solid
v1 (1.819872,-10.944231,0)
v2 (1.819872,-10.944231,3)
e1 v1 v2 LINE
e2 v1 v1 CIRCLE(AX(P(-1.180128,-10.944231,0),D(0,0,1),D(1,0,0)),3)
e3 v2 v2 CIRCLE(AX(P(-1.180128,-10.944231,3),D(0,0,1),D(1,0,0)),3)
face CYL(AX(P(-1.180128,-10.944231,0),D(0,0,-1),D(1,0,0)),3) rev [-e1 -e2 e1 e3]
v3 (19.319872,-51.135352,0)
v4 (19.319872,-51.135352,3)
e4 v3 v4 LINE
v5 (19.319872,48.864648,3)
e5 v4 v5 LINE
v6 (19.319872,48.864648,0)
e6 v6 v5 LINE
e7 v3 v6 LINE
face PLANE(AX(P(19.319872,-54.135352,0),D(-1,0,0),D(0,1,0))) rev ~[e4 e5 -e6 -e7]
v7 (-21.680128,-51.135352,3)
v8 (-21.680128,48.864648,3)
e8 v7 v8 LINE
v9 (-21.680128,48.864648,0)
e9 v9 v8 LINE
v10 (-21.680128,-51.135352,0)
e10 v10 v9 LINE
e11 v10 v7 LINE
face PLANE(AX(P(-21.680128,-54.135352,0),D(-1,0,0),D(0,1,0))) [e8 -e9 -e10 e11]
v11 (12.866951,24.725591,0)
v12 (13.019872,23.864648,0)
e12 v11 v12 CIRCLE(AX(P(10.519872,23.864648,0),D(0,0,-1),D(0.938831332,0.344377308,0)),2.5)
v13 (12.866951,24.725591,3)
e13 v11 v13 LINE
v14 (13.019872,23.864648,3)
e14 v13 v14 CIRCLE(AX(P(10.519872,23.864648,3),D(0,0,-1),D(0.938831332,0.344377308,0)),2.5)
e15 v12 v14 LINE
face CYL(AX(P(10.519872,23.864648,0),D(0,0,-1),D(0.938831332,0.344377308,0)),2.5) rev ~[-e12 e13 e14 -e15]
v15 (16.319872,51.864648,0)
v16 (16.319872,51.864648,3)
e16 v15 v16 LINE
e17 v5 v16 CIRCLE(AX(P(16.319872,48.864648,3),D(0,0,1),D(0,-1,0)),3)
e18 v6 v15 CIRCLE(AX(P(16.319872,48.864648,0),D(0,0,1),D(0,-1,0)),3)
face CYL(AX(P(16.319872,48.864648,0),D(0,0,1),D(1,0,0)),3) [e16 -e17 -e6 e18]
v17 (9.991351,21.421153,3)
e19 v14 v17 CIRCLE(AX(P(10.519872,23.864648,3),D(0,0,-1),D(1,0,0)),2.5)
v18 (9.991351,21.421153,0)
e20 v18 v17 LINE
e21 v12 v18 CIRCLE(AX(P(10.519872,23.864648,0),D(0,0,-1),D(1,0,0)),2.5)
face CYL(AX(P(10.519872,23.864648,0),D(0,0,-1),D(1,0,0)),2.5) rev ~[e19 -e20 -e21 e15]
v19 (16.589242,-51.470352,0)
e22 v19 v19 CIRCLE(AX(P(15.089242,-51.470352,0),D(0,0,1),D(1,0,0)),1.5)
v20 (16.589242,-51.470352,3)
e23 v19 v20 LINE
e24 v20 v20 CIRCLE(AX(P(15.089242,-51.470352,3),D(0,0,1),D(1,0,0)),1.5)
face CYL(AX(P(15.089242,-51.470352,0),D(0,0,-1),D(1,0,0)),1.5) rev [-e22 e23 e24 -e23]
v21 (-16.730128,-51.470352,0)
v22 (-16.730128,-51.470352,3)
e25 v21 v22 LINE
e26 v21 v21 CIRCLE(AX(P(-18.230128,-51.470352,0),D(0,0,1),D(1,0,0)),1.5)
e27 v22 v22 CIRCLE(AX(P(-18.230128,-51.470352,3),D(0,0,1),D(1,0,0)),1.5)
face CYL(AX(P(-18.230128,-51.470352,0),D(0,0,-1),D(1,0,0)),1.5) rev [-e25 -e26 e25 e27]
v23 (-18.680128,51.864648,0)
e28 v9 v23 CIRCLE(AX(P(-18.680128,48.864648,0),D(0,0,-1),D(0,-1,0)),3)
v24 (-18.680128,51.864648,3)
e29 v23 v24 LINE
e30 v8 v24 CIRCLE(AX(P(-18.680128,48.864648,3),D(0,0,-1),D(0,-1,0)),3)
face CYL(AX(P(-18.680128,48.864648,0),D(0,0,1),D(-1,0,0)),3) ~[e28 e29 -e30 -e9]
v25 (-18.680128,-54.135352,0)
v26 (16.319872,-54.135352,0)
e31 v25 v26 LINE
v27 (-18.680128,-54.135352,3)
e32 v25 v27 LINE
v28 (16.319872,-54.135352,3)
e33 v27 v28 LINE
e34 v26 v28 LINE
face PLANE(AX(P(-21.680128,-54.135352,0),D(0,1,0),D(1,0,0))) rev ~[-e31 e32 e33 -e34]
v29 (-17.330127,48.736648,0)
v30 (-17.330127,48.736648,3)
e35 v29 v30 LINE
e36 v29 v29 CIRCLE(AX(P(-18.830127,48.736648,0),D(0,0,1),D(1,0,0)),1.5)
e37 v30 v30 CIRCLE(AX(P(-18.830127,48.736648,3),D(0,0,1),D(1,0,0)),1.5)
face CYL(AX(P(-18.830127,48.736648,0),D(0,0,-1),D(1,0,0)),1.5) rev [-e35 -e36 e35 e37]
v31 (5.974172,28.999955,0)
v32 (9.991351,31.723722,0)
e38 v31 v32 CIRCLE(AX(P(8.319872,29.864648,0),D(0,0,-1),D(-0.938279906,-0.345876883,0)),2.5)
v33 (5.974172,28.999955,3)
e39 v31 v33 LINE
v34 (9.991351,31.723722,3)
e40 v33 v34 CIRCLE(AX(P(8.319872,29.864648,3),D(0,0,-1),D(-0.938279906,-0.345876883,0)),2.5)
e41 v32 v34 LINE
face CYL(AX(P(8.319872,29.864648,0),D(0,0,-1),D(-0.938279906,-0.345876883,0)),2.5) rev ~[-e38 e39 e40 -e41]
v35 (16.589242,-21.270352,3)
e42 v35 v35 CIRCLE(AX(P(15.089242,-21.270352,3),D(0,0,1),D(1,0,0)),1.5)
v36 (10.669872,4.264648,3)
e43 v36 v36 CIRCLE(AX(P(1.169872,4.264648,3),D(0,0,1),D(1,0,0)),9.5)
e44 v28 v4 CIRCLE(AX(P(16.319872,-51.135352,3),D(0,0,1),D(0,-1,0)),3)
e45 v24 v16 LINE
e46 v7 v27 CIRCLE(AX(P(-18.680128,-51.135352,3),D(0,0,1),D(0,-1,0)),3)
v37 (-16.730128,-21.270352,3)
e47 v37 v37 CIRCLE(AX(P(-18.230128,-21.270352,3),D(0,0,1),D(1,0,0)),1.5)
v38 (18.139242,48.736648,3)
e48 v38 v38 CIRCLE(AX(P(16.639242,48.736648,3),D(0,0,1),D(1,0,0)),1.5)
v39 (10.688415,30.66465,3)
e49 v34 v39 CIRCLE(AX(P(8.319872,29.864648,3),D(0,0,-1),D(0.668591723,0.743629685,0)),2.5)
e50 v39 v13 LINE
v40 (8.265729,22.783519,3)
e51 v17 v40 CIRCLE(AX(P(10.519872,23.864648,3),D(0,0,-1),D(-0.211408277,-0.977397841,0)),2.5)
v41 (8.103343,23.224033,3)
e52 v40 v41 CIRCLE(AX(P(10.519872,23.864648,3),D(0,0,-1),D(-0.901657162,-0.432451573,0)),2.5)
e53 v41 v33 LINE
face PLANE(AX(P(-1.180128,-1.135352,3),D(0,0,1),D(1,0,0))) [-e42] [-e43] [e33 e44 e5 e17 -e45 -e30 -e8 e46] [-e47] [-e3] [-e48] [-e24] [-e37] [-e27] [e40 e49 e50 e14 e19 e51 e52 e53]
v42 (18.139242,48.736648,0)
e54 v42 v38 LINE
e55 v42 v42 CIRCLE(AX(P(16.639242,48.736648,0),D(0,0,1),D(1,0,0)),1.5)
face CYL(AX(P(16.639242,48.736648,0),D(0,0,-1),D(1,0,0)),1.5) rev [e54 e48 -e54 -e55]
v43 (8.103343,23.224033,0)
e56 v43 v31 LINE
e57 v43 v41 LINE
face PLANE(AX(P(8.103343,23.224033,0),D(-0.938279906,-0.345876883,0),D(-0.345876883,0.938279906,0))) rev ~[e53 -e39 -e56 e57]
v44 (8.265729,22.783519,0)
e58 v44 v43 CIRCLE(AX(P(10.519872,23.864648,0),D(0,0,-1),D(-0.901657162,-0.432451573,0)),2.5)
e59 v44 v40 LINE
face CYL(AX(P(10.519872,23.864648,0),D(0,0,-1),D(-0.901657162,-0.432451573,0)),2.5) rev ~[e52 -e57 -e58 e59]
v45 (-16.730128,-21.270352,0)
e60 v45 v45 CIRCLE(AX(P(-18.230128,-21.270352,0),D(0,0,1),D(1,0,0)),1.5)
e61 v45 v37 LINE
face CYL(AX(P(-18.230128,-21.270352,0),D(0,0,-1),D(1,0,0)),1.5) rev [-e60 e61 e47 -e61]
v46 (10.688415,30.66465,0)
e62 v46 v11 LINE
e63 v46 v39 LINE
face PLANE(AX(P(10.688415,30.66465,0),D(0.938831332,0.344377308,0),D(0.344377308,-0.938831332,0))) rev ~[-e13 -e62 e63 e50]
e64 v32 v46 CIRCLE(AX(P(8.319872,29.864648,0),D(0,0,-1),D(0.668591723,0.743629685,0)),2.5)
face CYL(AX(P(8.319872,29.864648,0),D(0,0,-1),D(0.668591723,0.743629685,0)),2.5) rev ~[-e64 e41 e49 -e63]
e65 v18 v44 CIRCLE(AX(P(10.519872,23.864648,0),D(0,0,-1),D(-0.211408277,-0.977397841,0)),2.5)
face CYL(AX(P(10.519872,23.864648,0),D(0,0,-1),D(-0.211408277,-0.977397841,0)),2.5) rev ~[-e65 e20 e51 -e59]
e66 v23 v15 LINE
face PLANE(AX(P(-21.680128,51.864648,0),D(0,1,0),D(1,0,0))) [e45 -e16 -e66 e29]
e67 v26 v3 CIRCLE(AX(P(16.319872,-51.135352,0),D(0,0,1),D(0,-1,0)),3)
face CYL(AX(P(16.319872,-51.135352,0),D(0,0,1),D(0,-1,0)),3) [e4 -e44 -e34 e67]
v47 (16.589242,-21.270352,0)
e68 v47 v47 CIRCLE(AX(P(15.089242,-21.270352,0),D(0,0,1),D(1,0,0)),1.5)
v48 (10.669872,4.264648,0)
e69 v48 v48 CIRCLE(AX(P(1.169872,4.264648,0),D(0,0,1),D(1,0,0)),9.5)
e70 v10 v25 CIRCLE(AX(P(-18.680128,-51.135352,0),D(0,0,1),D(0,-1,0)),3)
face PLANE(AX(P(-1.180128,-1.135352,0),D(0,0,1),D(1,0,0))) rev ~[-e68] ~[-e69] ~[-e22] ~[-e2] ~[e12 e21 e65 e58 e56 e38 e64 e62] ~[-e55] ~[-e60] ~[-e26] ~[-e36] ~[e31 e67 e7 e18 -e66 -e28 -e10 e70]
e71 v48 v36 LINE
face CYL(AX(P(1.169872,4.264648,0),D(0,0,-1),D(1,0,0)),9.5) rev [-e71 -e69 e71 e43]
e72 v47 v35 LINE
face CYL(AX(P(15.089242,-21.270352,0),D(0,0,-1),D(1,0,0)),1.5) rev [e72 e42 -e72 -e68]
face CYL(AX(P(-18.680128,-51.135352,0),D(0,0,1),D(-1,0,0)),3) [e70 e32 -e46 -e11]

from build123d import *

# Parameters (mm, degrees)
F0_W     = 41
F0_H     = 106
F0_R     = 1.5
F0_R_2   = 5.05
F0_R_3   = 2
F0_R_4   = 3
F0_R_5   = 9.5
F1_DEPTH = 3
F2_R     = 3


# Not quite as in the source:
# - a feature names something its author has since deleted; it is built from what else it names


with BuildPart() as f1:
    # F0 (on Top) → F1 (new body)
    with BuildSketch(Plane.XY):
        with Locations((-1.1801278293, -1.1353523731)):
            Rectangle(F0_W, F0_H)
        with Locations((-18.2301278293, -51.4703523731)):
            Circle(F0_R, mode=Mode.SUBTRACT)
        with Locations((-6.776117335, -33.481924504)):
            Circle(F0_R_2, mode=Mode.SUBTRACT)
        with Locations((-18.2301278293, -21.2703523731)):
            Circle(F0_R, mode=Mode.SUBTRACT)
        with Locations((-11.8353097141, -18.4490393624)):
            Circle(F0_R_3, mode=Mode.SUBTRACT)
        with BuildLine():
            ThreePointArc((0.9913514778, -28.481924504), (-4.9415118708, -25.855220261), (-8.0481067447, -20.1589485871))
            Line((-8.0481067447, -20.1589485871), (9.9913514778, -20.516399593))
            Line((9.9913514778, -20.516399593), (9.9913514778, -46.516399593))
            Line((9.9913514778, -46.516399593), (-8.0481067447, -46.804900421))
            ThreePointArc((-8.0481067447, -46.804900421), (-4.9415118708, -41.1086287471), (0.9913514778, -38.481924504))
            Line((0.9913514778, -38.481924504), (0.9913514778, -28.481924504))
        make_face(mode=Mode.SUBTRACT)
        with Locations((15.0892422113, -51.4703523731)):
            Circle(F0_R, mode=Mode.SUBTRACT)
        with Locations((-1.1801278293, -10.9442314133)):
            Circle(F0_R_4, mode=Mode.SUBTRACT)
        with Locations((15.0892422113, -21.2703523731)):
            Circle(F0_R, mode=Mode.SUBTRACT)
        with Locations((-11.8353097141, -0.1353523731)):
            Circle(F0_R_3, mode=Mode.SUBTRACT)
        with Locations((-11.8353097141, 18.1783346161)):
            Circle(F0_R_3, mode=Mode.SUBTRACT)
        with Locations((-18.8301271707, 48.7366476269)):
            Circle(F0_R, mode=Mode.SUBTRACT)
        with Locations((-6.776117335, 33.2112197578)):
            Circle(F0_R_2, mode=Mode.SUBTRACT)
        with Locations((1.1698721707, 4.2646476269)):
            Circle(F0_R_5, mode=Mode.SUBTRACT)
        with BuildLine():
            ThreePointArc((0.9913514778, 38.2112197578), (-4.9415118708, 40.8379240009), (-8.0481067447, 46.5341956747))
            Line((-8.0481067447, 46.5341956747), (9.9913514778, 46.2456948468))
            Line((9.9913514778, 46.2456948468), (9.9913514778, 31.7237218389))
            ThreePointArc((9.9913514778, 31.7237218389), (10.4081379557, 31.2391097076), (10.6884153726, 30.6646495649))
            Line((10.6884153726, 30.6646495649), (12.8669505005, 24.7255908967))
            ThreePointArc((12.8669505005, 24.7255908967), (12.9813448828, 24.3018570593), (13.0198721707, 23.8646476269))
            ThreePointArc((13.0198721707, 23.8646476269), (12.0896967258, 21.9189727141), (9.9913514778, 21.4211530234))
            Line((9.9913514778, 21.4211530234), (9.9913514778, 20.2456948468))
            Line((9.9913514778, 20.2456948468), (-8.0481067447, 19.8882438409))
            ThreePointArc((-8.0481067447, 19.8882438409), (-4.9415118708, 25.5845155147), (0.9913514778, 28.2112197578))
            Line((0.9913514778, 28.2112197578), (0.9913514778, 38.2112197578))
        make_face(mode=Mode.SUBTRACT)
        with Locations((16.6392421771, 48.7366476269)):
            Circle(F0_R, mode=Mode.SUBTRACT)
        with BuildLine():
            Line((9.9913514778, -20.516399593), (-8.0481067447, -20.1589485871))
            ThreePointArc((-8.0481067447, -20.1589485871), (-4.9415118708, -25.855220261), (0.9913514778, -28.481924504))
            Line((0.9913514778, -28.481924504), (0.9913514778, -38.481924504))
            ThreePointArc((0.9913514778, -38.481924504), (-4.9415118708, -41.1086287471), (-8.0481067447, -46.804900421))
            Line((-8.0481067447, -46.804900421), (9.9913514778, -46.516399593))
            Line((9.9913514778, -46.516399593), (9.9913514778, -20.516399593))
        make_face()
        with Locations((-2.2937730764, -41.981924504)):
            Circle(F0_R, mode=Mode.SUBTRACT)
        with Locations((-2.2937730764, -24.981924504)):
            Circle(F0_R, mode=Mode.SUBTRACT)
        with BuildLine():
            Line((9.9913514778, 46.2456948468), (-8.0481067447, 46.5341956747))
            ThreePointArc((-8.0481067447, 46.5341956747), (-4.9415118708, 40.8379240009), (0.9913514778, 38.2112197578))
            Line((0.9913514778, 38.2112197578), (0.9913514778, 28.2112197578))
            ThreePointArc((0.9913514778, 28.2112197578), (-4.9415118708, 25.5845155147), (-8.0481067447, 19.8882438409))
            Line((-8.0481067447, 19.8882438409), (9.9913514778, 20.2456948468))
            Line((9.9913514778, 20.2456948468), (9.9913514778, 21.4211530234))
            ThreePointArc((9.9913514778, 21.4211530234), (8.9707387909, 21.9024586015), (8.2657292668, 22.7835186943))
            ThreePointArc((8.2657292668, 22.7835186943), (8.1741724057, 22.9999554201), (8.1033430916, 23.2240329142))
            Line((8.1033430916, 23.2240329142), (5.9741724057, 28.9999554201))
            ThreePointArc((5.9741724057, 28.9999554201), (6.9168863609, 31.9338578186), (9.9913514778, 31.7237218389))
            Line((9.9913514778, 31.7237218389), (9.9913514778, 46.2456948468))
        make_face()
        with Locations((-2.2937730764, 24.7112197578)):
            Circle(F0_R, mode=Mode.SUBTRACT)
        with Locations((-2.2937730764, 41.7112197578)):
            Circle(F0_R, mode=Mode.SUBTRACT)
        with Locations((-6.776117335, 33.2112197578)):
            Circle(F0_R_2)
        with Locations((-6.776117335, -33.481924504)):
            Circle(F0_R_2)
        with Locations((-11.8353097141, -18.4490393624)):
            Circle(F0_R_3)
        with Locations((-11.8353097141, -0.1353523731)):
            Circle(F0_R_3)
        with Locations((-11.8353097141, 18.1783346161)):
            Circle(F0_R_3)
        with Locations((-2.2937730764, -24.981924504)):
            Circle(F0_R)
        with Locations((-2.2937730764, -41.981924504)):
            Circle(F0_R)
        with Locations((-2.2937730764, 24.7112197578)):
            Circle(F0_R)
        with Locations((-2.2937730764, 41.7112197578)):
            Circle(F0_R)
    extrude(amount=F1_DEPTH)

    # F2
    f2_edges = [f1.edges().sort_by_distance(p)[0] for p in [
        (-21.680128, 51.864648, 1.5),
        (-21.680128, -54.135352, 1.5),
        (19.319872, -54.135352, 1.5),
        (19.319872, 51.864648, 1.5),
    ]]
    fillet(f2_edges, radius=F2_R)


solid = f1.part
